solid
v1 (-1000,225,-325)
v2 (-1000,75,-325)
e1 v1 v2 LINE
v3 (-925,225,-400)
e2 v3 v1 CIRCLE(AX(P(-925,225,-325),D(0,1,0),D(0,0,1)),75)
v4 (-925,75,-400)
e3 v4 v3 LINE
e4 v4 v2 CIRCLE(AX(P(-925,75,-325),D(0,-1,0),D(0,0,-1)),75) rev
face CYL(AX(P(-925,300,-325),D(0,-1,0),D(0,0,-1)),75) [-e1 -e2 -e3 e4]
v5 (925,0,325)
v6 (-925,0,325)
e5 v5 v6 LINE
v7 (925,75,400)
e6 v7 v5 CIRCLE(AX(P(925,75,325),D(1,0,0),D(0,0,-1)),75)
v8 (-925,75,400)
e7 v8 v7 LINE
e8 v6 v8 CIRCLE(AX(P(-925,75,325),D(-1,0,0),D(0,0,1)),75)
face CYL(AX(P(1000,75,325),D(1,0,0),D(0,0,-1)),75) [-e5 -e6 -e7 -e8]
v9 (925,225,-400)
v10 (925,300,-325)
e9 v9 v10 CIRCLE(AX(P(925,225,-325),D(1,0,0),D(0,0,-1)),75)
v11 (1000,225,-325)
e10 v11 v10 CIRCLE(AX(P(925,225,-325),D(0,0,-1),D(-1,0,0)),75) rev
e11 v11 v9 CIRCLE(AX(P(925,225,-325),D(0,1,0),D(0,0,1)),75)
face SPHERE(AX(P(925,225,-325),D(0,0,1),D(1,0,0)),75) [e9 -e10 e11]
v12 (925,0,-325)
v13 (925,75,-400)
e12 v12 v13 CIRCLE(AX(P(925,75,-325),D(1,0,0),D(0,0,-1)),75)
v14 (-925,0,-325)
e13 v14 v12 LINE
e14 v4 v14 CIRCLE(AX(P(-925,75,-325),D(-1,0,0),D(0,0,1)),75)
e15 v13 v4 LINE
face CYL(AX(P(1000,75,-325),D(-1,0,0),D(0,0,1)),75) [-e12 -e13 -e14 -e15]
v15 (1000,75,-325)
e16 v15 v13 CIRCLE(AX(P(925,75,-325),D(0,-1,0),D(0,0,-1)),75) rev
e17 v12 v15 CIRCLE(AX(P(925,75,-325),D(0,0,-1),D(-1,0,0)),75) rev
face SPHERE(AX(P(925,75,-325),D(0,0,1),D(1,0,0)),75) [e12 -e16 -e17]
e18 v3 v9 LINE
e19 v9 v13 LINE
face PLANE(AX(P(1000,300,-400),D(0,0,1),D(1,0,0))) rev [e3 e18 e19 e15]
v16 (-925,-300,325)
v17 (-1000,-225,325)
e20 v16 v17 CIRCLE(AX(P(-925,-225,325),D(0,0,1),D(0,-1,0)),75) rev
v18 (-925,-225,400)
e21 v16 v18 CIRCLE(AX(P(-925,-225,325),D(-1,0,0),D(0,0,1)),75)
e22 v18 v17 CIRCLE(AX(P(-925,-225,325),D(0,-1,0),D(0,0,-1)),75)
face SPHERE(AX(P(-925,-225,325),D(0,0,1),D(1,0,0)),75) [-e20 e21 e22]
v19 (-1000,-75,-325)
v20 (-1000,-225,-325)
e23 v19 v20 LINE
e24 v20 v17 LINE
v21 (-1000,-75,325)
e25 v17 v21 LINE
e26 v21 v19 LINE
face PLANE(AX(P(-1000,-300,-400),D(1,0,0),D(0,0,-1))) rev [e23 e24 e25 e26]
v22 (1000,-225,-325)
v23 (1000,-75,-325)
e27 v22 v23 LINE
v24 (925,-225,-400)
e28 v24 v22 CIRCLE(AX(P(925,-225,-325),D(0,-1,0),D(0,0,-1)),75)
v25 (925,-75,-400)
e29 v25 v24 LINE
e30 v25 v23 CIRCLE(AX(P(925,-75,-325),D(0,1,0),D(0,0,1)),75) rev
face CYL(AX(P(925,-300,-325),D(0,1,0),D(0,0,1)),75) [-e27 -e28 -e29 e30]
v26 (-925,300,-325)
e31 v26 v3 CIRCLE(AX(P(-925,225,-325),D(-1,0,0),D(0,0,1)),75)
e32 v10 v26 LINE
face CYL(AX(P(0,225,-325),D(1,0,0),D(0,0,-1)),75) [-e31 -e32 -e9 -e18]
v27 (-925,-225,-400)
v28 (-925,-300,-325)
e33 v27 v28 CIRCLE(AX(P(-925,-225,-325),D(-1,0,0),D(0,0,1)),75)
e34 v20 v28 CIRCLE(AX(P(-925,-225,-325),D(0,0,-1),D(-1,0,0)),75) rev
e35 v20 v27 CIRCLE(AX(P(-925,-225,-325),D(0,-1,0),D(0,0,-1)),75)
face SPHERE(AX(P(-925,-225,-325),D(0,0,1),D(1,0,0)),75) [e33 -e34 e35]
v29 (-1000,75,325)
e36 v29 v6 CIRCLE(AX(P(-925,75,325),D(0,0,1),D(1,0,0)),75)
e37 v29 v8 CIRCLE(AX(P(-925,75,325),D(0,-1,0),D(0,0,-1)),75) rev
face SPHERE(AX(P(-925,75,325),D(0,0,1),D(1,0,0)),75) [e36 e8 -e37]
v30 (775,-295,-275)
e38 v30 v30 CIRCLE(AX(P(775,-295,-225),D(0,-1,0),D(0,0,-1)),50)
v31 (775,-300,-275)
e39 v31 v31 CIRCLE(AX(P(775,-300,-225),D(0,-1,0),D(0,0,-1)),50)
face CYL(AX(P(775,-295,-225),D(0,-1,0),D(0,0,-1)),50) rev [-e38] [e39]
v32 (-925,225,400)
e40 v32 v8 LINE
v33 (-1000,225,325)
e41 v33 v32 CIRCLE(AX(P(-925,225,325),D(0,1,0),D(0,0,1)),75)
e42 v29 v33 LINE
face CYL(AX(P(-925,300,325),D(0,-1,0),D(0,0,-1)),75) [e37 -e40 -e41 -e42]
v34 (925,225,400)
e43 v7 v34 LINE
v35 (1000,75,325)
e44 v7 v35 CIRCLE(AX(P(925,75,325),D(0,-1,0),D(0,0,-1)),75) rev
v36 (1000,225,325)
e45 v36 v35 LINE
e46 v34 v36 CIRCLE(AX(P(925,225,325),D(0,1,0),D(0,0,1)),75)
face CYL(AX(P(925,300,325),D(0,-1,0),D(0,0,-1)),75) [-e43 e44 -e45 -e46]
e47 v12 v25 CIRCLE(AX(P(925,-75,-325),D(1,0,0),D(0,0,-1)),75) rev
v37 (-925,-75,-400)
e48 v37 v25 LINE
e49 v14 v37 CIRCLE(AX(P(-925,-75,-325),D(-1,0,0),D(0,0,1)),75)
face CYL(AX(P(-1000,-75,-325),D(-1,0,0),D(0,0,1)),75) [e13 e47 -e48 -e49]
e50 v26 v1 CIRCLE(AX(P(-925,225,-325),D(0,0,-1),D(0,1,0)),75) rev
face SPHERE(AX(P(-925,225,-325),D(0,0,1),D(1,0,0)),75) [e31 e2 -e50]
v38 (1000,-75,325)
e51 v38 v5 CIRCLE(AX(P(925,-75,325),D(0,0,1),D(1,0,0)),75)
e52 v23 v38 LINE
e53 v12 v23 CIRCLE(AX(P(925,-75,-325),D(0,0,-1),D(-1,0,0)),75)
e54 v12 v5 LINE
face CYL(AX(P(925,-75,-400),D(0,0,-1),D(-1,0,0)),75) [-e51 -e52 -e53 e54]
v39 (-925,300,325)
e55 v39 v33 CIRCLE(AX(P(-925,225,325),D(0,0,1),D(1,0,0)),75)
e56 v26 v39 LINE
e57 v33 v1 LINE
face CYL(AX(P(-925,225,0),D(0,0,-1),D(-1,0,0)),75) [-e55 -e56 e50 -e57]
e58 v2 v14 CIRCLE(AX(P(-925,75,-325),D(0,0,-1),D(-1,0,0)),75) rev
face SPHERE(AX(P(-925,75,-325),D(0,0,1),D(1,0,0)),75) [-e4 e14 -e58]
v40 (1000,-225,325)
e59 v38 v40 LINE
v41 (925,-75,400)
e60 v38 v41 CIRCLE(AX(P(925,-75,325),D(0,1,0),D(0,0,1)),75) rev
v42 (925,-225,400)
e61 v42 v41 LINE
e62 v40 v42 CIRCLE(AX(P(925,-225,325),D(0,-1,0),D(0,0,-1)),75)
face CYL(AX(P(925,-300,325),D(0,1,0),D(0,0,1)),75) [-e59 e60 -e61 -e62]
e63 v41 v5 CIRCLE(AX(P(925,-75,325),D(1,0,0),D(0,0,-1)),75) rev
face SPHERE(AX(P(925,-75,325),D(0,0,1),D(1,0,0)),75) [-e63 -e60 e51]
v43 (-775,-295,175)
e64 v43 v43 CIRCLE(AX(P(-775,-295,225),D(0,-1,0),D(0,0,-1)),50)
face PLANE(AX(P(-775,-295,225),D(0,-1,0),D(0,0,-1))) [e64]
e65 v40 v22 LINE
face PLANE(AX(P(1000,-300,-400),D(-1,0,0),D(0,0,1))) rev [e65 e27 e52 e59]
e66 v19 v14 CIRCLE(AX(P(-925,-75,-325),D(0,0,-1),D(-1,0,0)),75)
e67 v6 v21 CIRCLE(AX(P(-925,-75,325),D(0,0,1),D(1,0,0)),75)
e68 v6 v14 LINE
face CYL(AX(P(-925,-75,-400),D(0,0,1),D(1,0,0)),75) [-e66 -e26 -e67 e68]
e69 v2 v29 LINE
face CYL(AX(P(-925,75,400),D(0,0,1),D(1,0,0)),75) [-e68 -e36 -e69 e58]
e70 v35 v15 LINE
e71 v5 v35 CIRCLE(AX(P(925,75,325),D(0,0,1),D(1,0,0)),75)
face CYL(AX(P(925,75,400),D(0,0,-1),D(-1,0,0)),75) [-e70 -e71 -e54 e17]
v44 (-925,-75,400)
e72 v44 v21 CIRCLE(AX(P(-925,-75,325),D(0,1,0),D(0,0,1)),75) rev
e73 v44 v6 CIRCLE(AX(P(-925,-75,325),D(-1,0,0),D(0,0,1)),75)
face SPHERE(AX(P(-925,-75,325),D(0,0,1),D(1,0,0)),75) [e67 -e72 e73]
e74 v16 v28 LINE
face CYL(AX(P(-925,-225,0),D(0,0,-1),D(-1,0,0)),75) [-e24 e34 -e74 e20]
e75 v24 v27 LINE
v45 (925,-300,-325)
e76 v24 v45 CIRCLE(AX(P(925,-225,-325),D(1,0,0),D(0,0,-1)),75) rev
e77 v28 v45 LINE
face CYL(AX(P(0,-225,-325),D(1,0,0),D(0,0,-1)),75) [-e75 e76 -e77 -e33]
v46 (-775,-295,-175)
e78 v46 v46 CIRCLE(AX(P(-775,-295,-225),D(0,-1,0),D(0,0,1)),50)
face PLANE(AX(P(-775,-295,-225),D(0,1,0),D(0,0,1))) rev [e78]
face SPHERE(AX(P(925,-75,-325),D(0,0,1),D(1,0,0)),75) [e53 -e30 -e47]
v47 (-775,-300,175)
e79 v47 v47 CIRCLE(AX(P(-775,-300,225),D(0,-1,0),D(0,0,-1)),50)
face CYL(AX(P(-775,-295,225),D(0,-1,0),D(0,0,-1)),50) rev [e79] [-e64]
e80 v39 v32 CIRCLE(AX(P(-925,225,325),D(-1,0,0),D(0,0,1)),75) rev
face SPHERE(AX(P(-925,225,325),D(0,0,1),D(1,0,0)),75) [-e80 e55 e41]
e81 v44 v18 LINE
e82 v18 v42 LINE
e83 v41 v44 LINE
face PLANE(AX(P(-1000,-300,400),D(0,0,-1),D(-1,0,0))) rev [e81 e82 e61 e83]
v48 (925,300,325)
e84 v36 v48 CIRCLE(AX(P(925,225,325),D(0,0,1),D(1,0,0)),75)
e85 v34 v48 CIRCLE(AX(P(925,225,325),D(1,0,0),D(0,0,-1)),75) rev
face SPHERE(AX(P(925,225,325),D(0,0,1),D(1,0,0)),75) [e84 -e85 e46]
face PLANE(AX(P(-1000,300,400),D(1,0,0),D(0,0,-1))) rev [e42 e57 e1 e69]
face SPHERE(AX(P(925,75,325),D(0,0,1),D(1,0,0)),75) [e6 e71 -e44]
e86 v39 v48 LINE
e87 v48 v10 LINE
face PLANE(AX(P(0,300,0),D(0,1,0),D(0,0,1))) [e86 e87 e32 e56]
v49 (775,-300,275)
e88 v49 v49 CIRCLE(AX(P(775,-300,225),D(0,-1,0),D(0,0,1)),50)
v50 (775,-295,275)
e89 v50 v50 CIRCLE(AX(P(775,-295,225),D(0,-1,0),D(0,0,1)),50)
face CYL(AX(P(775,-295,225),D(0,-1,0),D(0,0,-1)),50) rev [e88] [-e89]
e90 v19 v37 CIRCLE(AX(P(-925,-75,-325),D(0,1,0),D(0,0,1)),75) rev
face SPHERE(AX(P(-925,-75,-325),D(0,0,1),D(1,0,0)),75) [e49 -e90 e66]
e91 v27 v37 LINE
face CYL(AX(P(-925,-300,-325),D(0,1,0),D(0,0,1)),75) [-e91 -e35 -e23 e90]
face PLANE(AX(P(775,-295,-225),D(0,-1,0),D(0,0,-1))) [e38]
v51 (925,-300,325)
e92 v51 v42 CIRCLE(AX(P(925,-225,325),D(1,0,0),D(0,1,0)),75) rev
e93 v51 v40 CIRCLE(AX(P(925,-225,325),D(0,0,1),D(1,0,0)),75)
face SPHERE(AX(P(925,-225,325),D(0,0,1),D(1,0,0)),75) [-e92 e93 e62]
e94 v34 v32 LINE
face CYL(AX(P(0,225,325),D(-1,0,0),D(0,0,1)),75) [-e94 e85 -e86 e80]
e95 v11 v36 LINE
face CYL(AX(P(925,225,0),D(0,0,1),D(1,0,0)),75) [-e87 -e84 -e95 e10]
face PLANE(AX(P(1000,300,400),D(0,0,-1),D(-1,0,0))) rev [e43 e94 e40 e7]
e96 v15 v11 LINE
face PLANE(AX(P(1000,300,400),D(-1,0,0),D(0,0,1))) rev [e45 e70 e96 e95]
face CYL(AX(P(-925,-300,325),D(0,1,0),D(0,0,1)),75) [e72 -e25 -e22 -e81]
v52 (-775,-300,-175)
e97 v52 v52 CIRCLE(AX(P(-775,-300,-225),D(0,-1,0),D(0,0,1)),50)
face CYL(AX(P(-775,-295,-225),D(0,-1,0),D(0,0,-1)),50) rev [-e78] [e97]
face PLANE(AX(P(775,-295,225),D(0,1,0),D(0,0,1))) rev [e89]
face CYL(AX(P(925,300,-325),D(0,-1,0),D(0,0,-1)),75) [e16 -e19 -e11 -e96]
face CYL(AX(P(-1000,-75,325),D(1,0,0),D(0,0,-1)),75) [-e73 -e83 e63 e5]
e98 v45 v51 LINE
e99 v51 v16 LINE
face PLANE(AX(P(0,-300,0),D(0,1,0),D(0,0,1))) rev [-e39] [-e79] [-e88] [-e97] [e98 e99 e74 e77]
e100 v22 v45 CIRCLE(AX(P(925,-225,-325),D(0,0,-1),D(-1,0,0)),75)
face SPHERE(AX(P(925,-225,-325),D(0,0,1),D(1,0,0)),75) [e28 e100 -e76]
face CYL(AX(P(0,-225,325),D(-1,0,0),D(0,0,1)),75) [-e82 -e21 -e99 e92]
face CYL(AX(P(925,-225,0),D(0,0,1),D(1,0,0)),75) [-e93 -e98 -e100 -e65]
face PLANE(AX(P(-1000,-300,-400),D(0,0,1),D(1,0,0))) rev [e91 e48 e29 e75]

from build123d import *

# Parameters (mm, degrees)
SKETCH1_W           = 2000
SKETCH1_H           = 800
BOSS_EXTRUDE1_DEPTH = 300
FILLET1_R           = 75
SKETCH2_W           = 2000
SKETCH2_H           = 800
BOSS_EXTRUDE2_DEPTH = 300
FILLET4_R           = 75
SKETCH3_R           = 50
CUT_EXTRUDE1_DEPTH  = 5


with BuildPart() as part:
    # Sketch1 → Boss-Extrude1 (new body)
    with BuildSketch(Plane(origin=(0, 0, 0), x_dir=(1, 0, 0), z_dir=(0, 1, 0))):
        Rectangle(SKETCH1_W, SKETCH1_H)
    extrude(amount=BOSS_EXTRUDE1_DEPTH)

    # Fillet1
    fillet1_edges = [part.edges().sort_by_distance(p)[0] for p in [
        (1000, 300, 0),
        (0, 300, -400),
        (-1000, 300, 0),
        (0, 0, -400),
        (1000, 0, 0),
        (0, 0, 400),
        (-1000, 0, 0),
        (0, 300, 400),
        (-1000, 150, -400),
        (1000, 150, -400),
        (1000, 150, 400),
        (-1000, 150, 400),
    ]]
    fillet(fillet1_edges, radius=FILLET1_R)

    # Sketch2 → Boss-Extrude2 (add)
    with BuildSketch(Plane.XZ):
        Rectangle(SKETCH2_W, SKETCH2_H)
    extrude(amount=BOSS_EXTRUDE2_DEPTH)

    # Fillet4
    fillet4_edges = [part.edges().sort_by_distance(p)[0] for p in [
        (1000, 0, 0),
        (1000, -150, -400),
        (0, 0, 400),
        (1000, -150, 400),
        (-1000, 0, 0),
        (-1000, -150, 400),
        (0, 0, -400),
        (-1000, -150, -400),
        (1000, -300, 0),
        (0, -300, 400),
        (-1000, -300, 0),
        (0, -300, -400),
    ]]
    fillet(fillet4_edges, radius=FILLET4_R - 0.0001)  # a hair under: the kernel refuses the full size

    # Sketch3 → Cut-Extrude1 (cut)
    with BuildSketch(Plane.XZ.offset(300)):
        with Locations(Location((-775, 225, 0), (0, 0, 270))):
            Circle(SKETCH3_R)
        with Locations(Location((775, 225, 0), (0, 0, 90))):
            Circle(SKETCH3_R)
        with Locations(Location((775, -225, 0), (0, 0, 270))):
            Circle(SKETCH3_R)
        with Locations(Location((-775, -225, 0), (0, 0, 90))):
            Circle(SKETCH3_R)
    extrude(amount=-CUT_EXTRUDE1_DEPTH, mode=Mode.SUBTRACT)


solid = part.part
